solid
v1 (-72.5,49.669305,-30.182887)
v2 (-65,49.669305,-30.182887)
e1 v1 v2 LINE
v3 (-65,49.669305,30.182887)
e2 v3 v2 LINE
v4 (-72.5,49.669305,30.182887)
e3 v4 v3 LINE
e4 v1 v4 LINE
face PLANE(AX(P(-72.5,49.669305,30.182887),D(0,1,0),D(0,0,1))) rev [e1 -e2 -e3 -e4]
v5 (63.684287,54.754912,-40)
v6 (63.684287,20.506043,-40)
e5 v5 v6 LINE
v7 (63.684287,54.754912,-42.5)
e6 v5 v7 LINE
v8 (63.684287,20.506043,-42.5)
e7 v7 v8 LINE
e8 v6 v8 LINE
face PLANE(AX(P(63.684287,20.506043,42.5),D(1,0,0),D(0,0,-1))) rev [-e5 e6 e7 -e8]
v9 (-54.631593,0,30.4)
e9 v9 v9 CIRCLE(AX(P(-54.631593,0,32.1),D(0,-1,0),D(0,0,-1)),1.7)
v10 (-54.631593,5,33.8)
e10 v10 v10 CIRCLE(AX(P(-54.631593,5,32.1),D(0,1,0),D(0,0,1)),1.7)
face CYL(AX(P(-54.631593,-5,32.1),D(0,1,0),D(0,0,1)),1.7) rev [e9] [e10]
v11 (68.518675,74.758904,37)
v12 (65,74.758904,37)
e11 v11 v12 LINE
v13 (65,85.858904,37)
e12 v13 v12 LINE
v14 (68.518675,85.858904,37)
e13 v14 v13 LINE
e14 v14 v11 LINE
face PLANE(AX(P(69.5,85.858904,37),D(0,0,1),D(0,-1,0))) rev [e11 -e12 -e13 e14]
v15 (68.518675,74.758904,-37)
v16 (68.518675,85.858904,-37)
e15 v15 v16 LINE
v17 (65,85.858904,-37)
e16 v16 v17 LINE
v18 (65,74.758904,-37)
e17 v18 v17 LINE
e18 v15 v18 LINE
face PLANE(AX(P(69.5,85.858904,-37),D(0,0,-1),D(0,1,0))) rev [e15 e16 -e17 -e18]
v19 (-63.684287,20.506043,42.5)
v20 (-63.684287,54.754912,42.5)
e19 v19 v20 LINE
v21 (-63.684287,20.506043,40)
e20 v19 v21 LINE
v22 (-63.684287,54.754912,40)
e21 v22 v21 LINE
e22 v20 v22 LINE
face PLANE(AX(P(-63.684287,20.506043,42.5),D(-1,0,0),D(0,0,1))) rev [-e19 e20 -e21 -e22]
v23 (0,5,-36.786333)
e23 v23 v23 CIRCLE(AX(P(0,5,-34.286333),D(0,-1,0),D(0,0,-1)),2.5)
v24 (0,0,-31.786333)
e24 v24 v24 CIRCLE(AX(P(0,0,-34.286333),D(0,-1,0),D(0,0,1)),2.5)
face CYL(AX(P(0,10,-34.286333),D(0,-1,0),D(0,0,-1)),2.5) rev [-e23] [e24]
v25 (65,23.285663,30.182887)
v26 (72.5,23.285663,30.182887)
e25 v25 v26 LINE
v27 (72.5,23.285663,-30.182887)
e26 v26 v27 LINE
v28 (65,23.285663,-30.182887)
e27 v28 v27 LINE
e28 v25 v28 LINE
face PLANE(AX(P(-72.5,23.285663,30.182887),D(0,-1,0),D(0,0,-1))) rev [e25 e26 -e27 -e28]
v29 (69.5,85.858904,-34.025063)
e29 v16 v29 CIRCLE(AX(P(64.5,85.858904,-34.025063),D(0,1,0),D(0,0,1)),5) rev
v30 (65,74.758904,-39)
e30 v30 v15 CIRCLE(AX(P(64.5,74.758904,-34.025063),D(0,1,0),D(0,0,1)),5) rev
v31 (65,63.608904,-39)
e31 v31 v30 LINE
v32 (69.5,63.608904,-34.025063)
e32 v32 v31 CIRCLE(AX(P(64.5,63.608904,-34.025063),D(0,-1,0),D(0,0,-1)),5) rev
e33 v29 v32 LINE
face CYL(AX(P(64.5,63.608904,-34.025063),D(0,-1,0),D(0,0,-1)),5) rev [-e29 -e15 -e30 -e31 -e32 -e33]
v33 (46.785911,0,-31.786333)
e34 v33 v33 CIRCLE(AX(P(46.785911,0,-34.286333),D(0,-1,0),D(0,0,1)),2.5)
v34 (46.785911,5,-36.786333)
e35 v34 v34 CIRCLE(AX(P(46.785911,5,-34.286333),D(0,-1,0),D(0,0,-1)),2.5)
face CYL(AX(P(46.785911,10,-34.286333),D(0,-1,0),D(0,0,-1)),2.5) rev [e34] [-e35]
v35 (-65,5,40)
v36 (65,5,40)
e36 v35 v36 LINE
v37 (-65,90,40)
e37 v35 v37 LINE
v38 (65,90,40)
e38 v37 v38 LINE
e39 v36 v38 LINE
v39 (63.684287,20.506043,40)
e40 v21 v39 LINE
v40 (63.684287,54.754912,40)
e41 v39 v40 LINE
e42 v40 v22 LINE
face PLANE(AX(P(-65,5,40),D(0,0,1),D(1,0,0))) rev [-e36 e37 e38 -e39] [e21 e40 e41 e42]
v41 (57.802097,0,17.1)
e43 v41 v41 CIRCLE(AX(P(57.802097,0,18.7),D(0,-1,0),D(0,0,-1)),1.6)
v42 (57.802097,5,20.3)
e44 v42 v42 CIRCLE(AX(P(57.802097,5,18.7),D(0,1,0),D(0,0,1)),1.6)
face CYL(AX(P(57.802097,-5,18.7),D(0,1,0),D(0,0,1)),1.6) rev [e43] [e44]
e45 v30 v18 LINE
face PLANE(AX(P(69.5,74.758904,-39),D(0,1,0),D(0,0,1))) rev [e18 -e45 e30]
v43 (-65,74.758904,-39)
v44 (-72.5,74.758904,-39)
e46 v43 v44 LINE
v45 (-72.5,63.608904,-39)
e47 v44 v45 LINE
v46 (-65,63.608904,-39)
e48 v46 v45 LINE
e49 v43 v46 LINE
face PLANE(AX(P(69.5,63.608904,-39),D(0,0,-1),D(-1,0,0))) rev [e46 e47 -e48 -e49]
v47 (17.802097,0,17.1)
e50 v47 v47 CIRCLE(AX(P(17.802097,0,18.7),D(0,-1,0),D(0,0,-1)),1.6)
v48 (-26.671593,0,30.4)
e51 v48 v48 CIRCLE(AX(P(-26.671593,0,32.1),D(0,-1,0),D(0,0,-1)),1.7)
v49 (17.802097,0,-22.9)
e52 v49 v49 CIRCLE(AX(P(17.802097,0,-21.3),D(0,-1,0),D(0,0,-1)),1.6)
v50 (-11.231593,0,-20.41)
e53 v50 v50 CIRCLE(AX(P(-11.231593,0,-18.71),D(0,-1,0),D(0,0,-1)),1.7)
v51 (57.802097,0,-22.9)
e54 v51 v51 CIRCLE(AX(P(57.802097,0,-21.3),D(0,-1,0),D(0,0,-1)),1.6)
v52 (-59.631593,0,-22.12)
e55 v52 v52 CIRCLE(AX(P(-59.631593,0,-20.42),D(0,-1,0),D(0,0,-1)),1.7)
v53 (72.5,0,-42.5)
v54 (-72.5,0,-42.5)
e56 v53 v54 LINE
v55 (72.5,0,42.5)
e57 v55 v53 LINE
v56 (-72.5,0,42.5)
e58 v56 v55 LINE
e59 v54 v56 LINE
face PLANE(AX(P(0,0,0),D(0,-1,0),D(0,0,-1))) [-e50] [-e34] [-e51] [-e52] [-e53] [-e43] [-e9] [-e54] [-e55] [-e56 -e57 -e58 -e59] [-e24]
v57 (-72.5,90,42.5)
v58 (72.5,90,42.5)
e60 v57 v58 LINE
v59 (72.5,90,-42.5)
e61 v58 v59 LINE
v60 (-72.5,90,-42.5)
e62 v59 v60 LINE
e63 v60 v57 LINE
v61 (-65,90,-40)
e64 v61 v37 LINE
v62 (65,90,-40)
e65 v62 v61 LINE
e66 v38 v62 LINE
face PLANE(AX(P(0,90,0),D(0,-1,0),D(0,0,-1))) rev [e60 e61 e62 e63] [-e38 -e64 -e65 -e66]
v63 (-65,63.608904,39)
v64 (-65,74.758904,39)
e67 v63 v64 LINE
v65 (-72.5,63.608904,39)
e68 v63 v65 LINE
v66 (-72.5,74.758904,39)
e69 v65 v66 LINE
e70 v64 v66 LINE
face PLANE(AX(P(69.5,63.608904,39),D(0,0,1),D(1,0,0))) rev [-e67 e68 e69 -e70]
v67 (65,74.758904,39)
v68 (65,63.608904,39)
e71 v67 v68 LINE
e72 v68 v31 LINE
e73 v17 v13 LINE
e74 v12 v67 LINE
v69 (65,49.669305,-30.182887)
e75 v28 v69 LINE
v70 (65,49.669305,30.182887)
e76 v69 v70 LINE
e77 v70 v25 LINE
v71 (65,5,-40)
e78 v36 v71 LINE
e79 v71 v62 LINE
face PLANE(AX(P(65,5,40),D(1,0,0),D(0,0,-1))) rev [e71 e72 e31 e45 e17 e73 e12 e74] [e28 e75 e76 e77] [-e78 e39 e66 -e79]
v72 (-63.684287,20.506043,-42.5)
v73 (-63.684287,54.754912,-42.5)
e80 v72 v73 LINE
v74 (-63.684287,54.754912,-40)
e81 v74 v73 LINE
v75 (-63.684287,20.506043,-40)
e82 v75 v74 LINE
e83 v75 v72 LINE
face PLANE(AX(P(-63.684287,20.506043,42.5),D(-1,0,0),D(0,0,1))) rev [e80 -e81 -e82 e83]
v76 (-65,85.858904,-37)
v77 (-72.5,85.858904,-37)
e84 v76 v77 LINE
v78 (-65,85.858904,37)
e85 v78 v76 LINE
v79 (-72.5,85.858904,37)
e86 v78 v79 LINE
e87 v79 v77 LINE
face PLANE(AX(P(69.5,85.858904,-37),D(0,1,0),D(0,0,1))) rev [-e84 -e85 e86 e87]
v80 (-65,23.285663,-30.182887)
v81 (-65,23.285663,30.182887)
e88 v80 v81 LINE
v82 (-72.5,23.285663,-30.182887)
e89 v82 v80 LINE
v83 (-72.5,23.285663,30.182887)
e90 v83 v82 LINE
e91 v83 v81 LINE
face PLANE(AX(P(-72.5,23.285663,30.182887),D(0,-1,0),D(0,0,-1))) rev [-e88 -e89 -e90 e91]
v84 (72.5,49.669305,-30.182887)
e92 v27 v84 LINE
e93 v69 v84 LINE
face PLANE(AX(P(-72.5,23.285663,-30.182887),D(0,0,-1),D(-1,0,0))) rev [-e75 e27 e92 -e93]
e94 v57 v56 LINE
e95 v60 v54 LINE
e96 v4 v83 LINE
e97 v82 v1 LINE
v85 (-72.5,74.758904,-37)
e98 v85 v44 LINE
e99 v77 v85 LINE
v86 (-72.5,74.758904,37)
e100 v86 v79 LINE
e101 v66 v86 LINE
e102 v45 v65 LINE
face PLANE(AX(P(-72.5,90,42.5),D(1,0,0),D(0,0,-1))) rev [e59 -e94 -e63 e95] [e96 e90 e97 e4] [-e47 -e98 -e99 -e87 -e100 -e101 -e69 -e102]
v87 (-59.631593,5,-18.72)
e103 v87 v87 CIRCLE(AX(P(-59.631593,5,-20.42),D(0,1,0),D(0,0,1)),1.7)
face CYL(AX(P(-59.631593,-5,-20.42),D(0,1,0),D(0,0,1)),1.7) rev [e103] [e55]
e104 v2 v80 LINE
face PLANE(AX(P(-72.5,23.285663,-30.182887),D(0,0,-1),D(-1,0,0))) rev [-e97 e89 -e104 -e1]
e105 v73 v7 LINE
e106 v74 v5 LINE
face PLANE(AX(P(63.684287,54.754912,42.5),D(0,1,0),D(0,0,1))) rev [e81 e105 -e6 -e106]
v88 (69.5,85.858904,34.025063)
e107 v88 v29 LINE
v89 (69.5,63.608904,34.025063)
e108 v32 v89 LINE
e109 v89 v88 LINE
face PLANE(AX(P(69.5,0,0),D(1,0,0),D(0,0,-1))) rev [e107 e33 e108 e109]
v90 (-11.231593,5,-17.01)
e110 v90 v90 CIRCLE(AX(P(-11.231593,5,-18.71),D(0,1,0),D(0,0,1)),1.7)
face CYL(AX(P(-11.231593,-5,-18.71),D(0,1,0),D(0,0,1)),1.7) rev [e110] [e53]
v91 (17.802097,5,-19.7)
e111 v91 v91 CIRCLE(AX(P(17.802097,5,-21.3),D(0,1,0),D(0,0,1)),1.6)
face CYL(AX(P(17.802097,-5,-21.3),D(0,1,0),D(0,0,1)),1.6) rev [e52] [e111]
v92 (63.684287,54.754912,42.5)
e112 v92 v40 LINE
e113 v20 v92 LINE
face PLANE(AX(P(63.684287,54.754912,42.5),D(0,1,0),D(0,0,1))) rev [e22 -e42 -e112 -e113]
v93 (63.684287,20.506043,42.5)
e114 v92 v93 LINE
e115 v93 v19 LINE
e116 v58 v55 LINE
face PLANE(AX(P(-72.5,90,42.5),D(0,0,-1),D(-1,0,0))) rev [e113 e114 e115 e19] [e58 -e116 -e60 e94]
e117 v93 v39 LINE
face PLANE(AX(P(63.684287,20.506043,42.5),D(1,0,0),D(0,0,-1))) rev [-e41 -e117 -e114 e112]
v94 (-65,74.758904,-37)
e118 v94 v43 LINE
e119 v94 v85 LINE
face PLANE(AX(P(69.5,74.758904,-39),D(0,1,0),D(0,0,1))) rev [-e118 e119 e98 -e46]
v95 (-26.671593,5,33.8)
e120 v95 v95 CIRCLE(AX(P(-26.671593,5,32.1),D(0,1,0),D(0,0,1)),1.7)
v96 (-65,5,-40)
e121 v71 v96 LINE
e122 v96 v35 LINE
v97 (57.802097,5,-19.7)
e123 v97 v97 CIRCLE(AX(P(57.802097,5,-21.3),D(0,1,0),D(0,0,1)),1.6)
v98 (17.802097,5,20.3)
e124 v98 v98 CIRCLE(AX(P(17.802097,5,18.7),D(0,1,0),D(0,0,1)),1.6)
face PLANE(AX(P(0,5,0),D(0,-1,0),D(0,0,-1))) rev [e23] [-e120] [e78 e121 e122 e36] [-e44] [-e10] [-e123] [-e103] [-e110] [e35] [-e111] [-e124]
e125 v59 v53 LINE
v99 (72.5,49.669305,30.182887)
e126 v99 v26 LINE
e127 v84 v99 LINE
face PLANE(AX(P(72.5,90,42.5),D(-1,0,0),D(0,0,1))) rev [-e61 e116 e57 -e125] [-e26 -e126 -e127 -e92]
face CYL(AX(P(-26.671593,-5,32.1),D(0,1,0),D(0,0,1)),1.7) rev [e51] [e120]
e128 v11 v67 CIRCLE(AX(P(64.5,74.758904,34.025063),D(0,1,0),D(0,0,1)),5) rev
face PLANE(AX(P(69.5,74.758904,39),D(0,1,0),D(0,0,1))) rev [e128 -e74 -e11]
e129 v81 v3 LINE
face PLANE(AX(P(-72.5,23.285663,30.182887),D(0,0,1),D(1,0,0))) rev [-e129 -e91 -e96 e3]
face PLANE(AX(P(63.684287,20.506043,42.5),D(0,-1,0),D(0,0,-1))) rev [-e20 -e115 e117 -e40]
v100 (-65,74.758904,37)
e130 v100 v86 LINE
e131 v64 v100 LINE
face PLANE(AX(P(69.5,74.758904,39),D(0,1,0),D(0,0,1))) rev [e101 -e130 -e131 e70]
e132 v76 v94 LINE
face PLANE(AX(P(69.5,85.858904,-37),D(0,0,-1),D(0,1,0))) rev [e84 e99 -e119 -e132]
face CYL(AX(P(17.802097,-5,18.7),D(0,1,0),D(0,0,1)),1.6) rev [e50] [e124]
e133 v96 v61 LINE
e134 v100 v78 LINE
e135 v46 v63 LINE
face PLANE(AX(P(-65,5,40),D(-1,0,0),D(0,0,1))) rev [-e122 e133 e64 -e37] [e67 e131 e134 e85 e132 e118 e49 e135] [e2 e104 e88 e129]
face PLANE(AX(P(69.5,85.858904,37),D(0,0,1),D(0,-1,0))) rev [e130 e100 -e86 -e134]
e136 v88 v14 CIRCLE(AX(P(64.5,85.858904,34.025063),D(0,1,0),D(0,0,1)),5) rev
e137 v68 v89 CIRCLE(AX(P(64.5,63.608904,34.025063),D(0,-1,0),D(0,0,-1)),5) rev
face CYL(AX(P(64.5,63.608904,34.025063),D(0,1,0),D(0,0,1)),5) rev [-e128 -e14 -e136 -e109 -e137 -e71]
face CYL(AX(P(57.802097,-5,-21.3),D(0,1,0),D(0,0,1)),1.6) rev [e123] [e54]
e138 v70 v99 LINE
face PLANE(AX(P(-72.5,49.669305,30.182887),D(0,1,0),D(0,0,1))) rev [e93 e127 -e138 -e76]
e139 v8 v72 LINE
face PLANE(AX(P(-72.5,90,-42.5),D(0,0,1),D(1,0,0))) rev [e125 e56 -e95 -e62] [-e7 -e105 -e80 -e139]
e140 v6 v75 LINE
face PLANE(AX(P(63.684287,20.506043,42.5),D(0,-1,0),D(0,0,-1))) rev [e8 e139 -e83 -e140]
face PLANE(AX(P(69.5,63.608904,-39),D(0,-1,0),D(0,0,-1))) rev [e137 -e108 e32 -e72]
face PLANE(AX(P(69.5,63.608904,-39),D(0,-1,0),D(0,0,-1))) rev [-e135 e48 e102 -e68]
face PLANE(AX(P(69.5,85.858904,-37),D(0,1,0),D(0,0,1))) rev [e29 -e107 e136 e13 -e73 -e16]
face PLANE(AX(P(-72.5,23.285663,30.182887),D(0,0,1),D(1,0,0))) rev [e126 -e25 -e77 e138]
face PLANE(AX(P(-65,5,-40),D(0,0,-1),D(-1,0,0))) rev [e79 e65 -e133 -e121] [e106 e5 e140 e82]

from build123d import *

# Parameters (mm, degrees)
SKETCH1_W           = 145
SKETCH1_H           = 85
BOSS_EXTRUDE1_DEPTH = 90
SKETCH3_W           = 130
SKETCH3_H           = 80
CUT_EXTRUDE1_DEPTH  = 85
SKETCH8_R           = 1.7
CUT_EXTRUDE2_DEPTH  = 10
SKETCH9_R           = 1.6
CUT_EXTRUDE3_DEPTH  = 10
SKETCH10_W          = 60.36577322
SKETCH10_H          = 26.383642142
CUT_EXTRUDE4_DEPTH  = 176.87282337
SKETCH11_W          = 127.368574342
SKETCH11_H          = 34.248868694
CUT_EXTRUDE5_DEPTH  = 144.461667354
CUT_EXTRUDE8_DEPTH  = 142
SKETCH13_R          = 2.5
CUT_EXTRUDE9_DEPTH  = 10
FILLET1_R           = 5


with BuildPart() as part:
    # Sketch1 → Boss-Extrude1 (new body)
    with BuildSketch(Plane(origin=(0, 0, 0), x_dir=(1, 0, 0), z_dir=(0, 1, 0))):
        Rectangle(SKETCH1_W, SKETCH1_H)
    extrude(amount=BOSS_EXTRUDE1_DEPTH)

    # Sketch3 → Cut-Extrude1 (cut)
    with BuildSketch(Plane(origin=(0, 90, 0), x_dir=(1, 0, 0), z_dir=(0, 1, 0))):
        Rectangle(SKETCH3_W, SKETCH3_H)
    extrude(amount=-CUT_EXTRUDE1_DEPTH, mode=Mode.SUBTRACT)

    # Sketch8 → Cut-Extrude2 (cut)
    with BuildSketch(Plane(origin=(0, 5, 0), x_dir=(1, 0, 0), z_dir=(0, 1, 0))):
        with Locations(Location((-59.631593059, 20.42, 0), (0, 0, 270))):
            Circle(SKETCH8_R)
        with Locations(Location((-11.231593059, 18.71, 0), (0, 0, 270))):
            Circle(SKETCH8_R)
        with Locations(Location((-54.631593059, -32.1, 0), (0, 0, 270))):
            Circle(SKETCH8_R)
        with Locations(Location((-26.671593059, -32.1, 0), (0, 0, 270))):
            Circle(SKETCH8_R)
    extrude(amount=-CUT_EXTRUDE2_DEPTH, mode=Mode.SUBTRACT)

    # Sketch9 → Cut-Extrude3 (cut)
    with BuildSketch(Plane(origin=(0, 5, 0), x_dir=(1, 0, 0), z_dir=(0, 1, 0))):
        with Locations(Location((57.802096986, 21.3, 0), (0, 0, 270))):
            Circle(SKETCH9_R)
        with Locations(Location((17.802096986, 21.3, 0), (0, 0, 270))):
            Circle(SKETCH9_R)
        with Locations(Location((17.802096986, -18.7, 0), (0, 0, 270))):
            Circle(SKETCH9_R)
        with Locations(Location((57.802096986, -18.7, 0), (0, 0, 270))):
            Circle(SKETCH9_R)
    extrude(amount=-CUT_EXTRUDE3_DEPTH, mode=Mode.SUBTRACT)

    # Sketch10 → Cut-Extrude4 (cut, through all)
    with BuildSketch(Plane(origin=(72.5, 0, 0), x_dir=(0, 0, -1), z_dir=(1, 0, 0))):
        with Locations((0, 36.47748396)):
            Rectangle(SKETCH10_W, SKETCH10_H)
    extrude(amount=-CUT_EXTRUDE4_DEPTH, mode=Mode.SUBTRACT)

    # Sketch11 → Cut-Extrude5 (cut, through all)
    with BuildSketch(Plane(origin=(0, 0, -42.5), x_dir=(-1, 0, 0), z_dir=(0, 0, -1))):
        with Locations((0, 37.630477743)):
            Rectangle(SKETCH11_W, SKETCH11_H)
    extrude(amount=-CUT_EXTRUDE5_DEPTH, mode=Mode.SUBTRACT)

    # Sketch12 → Cut-Extrude8 (cut)
    with BuildSketch(Plane.ZY.offset(72.5)):
        Polygon((-39, 63.608903916), (39, 63.608903916), (39, 74.758903916), (37, 74.758903916), (37, 85.858903916), (-37, 85.858903916), (-37, 74.758903916), (-39, 74.758903916), align=None)
    extrude(amount=-CUT_EXTRUDE8_DEPTH, mode=Mode.SUBTRACT)

    # Sketch13 → Cut-Extrude9 (cut)
    with BuildSketch(Plane.XZ):
        with Locations(Location((46.785911221, -34.286332812, 0), (0, 0, 270))):
            Circle(SKETCH13_R)
        with Locations(Location((0, -34.286332812, 0), (0, 0, 270))):
            Circle(SKETCH13_R)
    extrude(amount=-CUT_EXTRUDE9_DEPTH, mode=Mode.SUBTRACT)

    # Fillet1
    # the kernel refuses this fillet: 5 mm, written as the material it adds along each edge
    with BuildSketch(Plane(origin=(69.5, 87.19624688, -39), x_dir=(-1, 0, 0), z_dir=(0, -1, 0)), Plane(origin=(69.5, 51.171560952, 39), x_dir=(-1, 0, 0), z_dir=(0, 1, 0))) as fillet1_piece_1:
        with BuildLine():
            CenterArc((5, -4.974937186), FILLET1_R, 95.739170477, 84.260829523)
            Line((0, -4.974937186), (-0.1, -4.974937186))
            Line((-0.1, -4.974937186), (-0.1, 0))
            Line((-0.1, 0), (0, 0.1))
            ThreePointArc((0, 0.1), (2.25, 0.1), (4.49, 0.099498744))
            Line((4.49, 0.099498744), (4.5, 0))
        make_face()
    extrude(amount=36.024685928)


solid = part.part
